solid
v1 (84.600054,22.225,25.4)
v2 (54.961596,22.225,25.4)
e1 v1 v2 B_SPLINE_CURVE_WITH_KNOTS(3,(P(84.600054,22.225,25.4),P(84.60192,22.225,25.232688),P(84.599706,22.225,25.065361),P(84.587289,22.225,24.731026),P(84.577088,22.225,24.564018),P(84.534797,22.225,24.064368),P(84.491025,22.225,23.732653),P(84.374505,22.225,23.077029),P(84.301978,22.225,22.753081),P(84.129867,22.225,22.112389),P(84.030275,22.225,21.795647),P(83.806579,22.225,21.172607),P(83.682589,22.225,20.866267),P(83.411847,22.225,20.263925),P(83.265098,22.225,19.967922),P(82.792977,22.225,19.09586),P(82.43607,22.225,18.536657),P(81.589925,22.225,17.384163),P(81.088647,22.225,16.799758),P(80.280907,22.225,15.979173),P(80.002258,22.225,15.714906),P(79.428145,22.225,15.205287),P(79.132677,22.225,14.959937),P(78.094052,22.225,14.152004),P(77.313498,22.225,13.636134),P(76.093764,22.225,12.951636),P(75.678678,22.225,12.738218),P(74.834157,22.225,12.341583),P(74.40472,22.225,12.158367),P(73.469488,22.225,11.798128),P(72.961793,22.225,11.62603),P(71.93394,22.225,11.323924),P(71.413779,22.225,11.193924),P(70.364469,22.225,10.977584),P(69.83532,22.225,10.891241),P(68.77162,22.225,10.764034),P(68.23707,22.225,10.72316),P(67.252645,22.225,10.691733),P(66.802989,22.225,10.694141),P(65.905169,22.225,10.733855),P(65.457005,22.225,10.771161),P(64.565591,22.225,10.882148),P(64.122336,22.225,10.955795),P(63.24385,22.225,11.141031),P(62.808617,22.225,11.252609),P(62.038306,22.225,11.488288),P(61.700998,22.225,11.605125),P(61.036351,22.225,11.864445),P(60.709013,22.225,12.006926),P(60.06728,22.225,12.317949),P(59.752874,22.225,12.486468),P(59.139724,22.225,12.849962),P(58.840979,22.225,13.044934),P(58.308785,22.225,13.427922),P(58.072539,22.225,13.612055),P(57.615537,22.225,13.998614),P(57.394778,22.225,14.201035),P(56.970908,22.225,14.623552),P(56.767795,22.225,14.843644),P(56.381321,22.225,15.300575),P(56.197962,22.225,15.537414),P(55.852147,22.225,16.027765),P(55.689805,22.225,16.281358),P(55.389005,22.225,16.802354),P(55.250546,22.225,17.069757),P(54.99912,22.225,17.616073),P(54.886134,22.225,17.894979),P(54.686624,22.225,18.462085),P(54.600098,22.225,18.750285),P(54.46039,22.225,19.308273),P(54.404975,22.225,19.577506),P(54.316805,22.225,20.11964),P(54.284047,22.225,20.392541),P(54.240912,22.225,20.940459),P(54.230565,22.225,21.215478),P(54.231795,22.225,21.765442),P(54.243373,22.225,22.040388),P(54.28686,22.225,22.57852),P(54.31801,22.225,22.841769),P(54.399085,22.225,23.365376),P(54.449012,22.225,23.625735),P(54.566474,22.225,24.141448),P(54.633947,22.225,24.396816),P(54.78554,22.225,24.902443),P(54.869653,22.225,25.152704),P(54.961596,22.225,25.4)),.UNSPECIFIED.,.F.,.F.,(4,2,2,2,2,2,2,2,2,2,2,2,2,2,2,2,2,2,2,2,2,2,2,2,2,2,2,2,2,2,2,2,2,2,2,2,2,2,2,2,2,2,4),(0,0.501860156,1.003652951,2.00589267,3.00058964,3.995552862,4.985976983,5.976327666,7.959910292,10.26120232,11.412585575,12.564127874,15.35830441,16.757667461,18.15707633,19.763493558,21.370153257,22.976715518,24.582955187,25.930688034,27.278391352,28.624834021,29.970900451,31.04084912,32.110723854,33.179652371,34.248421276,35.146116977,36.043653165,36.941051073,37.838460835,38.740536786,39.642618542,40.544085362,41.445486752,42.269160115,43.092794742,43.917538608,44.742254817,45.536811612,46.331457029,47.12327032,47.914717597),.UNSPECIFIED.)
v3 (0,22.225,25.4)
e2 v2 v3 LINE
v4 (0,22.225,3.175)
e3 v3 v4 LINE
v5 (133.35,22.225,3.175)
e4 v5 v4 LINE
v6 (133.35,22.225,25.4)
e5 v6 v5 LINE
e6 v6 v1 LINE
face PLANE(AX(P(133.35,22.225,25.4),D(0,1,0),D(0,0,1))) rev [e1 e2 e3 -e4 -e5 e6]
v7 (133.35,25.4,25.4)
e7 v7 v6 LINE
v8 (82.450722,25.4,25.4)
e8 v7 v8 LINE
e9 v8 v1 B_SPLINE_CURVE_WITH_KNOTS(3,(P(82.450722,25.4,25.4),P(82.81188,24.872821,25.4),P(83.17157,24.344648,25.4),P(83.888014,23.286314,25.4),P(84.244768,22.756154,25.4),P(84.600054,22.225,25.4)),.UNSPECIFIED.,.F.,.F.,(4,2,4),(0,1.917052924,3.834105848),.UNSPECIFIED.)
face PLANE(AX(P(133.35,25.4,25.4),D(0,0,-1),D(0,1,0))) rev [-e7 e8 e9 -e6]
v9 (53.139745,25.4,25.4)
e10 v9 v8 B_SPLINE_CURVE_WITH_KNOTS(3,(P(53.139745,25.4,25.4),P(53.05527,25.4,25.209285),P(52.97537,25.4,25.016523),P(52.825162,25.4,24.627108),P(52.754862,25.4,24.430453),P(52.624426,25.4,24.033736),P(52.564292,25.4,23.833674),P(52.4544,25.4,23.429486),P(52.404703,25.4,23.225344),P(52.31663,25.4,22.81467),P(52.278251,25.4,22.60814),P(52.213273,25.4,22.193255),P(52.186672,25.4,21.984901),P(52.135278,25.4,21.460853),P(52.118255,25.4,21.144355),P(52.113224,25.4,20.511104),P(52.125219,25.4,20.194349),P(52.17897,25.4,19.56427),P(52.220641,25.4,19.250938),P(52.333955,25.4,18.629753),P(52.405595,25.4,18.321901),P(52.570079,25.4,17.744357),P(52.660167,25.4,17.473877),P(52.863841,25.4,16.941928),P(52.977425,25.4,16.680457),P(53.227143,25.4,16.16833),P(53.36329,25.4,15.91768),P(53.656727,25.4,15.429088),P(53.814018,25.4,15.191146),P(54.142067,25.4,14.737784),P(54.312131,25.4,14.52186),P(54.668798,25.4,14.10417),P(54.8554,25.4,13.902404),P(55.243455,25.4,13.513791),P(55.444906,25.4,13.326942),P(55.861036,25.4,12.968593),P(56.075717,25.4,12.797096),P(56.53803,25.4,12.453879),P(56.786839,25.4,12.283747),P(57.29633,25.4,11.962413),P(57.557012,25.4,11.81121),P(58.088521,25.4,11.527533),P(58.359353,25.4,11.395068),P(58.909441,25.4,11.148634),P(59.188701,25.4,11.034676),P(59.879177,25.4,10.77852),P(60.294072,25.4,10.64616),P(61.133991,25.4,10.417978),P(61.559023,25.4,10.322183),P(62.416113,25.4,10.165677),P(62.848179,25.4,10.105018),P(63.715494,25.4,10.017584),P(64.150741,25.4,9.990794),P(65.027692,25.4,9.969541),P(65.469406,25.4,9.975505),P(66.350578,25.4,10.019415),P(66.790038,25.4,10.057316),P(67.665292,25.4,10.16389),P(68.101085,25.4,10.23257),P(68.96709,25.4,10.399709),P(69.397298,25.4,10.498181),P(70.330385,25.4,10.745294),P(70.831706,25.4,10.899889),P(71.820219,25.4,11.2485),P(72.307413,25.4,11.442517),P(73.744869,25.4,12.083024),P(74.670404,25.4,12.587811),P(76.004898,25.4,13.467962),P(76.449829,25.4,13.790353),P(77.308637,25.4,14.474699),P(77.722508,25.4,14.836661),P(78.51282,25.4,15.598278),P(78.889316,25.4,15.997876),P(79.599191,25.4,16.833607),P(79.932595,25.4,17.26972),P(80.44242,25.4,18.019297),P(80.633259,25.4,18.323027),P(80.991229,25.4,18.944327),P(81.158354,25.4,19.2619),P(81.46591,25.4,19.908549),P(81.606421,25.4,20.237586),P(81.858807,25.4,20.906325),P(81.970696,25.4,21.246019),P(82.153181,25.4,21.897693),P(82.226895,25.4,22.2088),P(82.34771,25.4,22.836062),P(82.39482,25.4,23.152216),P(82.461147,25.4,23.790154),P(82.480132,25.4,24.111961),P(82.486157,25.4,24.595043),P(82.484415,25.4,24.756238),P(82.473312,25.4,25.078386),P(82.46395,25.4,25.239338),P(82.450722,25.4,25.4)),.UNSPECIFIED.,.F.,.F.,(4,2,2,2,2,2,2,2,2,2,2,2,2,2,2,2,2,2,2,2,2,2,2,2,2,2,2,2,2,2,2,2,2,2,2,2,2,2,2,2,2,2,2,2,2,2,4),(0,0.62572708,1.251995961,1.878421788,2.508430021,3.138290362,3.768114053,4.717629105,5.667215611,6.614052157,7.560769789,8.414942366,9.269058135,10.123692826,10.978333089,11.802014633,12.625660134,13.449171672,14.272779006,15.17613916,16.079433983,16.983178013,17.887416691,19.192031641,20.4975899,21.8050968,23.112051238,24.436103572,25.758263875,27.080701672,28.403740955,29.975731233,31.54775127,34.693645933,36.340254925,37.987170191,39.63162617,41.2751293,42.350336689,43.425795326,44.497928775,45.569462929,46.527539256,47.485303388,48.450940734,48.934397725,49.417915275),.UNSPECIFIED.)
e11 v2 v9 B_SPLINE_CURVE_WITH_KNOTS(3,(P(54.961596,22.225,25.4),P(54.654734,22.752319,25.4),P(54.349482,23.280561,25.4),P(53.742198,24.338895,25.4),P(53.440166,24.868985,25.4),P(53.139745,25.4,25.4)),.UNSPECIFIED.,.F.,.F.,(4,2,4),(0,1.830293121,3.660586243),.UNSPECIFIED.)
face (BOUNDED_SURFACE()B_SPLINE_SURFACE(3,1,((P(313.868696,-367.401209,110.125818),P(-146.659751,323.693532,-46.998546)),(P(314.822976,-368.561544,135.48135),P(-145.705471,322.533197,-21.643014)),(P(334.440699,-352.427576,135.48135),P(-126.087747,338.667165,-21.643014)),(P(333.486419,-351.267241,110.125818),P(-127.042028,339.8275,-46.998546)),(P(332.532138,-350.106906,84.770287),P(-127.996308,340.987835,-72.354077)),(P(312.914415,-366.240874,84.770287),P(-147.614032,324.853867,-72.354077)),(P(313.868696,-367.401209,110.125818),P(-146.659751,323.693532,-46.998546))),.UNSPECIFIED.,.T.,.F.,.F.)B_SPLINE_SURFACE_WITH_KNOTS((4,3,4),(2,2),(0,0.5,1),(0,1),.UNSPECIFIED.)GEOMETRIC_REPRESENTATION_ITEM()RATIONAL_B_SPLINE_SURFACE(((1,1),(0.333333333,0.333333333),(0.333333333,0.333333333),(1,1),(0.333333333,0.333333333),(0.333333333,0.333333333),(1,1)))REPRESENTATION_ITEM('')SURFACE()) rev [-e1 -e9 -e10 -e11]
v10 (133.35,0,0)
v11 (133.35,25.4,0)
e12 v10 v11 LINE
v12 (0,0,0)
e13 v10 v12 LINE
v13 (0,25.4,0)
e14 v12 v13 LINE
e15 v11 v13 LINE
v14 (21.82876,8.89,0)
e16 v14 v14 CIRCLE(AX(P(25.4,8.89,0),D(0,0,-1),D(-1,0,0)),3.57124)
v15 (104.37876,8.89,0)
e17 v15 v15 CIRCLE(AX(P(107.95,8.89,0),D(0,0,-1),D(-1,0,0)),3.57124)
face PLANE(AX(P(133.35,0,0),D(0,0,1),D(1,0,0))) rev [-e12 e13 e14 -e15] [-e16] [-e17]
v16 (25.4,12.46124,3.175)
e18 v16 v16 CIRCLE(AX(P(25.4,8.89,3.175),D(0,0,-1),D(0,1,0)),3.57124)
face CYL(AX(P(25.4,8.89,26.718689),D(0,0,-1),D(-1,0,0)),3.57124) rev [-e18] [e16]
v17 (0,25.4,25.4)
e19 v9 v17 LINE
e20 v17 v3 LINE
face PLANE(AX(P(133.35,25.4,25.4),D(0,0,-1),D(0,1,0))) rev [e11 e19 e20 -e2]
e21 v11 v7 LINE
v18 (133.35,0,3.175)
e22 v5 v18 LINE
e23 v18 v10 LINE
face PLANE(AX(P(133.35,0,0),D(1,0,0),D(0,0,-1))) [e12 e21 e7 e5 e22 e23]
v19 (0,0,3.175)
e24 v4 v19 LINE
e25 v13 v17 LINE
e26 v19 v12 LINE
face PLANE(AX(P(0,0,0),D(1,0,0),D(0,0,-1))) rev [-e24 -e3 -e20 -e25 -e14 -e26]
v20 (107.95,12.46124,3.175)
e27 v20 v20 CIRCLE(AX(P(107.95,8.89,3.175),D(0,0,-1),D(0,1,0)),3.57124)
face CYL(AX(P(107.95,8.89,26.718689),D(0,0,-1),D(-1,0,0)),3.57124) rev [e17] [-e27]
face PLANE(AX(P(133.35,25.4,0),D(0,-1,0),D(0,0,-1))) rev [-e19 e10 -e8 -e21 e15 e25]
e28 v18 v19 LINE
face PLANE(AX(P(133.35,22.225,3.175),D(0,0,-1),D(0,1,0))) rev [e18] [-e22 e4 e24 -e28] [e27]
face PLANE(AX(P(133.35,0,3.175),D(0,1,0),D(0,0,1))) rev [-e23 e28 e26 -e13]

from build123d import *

# Parameters (mm, degrees)
BOSS_EXTRUDE1_DEPTH = 133.35
SKETCH5_R           = 3.57124
CUT_EXTRUDE1_DEPTH  = 139.103376269


with BuildPart() as part:
    # Sketch1 → Boss-Extrude1 (new body)
    with BuildSketch(Plane(origin=(0, 0, 0), x_dir=(0, 0, -1), z_dir=(1, 0, 0))):
        Polygon((0, 0), (0, 25.4), (-25.4, 25.4), (-25.4, 22.225), (-3.175, 22.225), (-3.175, 0), align=None)
    extrude(amount=BOSS_EXTRUDE1_DEPTH)

    # Cut-Sweep1: read off the stored shape, not the designer's step
    # Cut-Sweep1: loft between two sections, ruled curve by curve
    cut_sweep1_from = [
        Edge.make_bspline([(313.868695545, -367.401209175, 110.125818187), (314.822976006, -368.561544306, 135.48134956), (334.440699372, -352.427576105, 135.48134956), (333.486418911, -351.267240974, 110.125818187), (332.53213845, -350.106905843, 84.770286815), (312.914415084, -366.240874045, 84.770286815), (313.868695545, -367.401209175, 110.125818187)], [0, 0, 0, 0, 0.5, 0.5, 0.5, 1, 1, 1, 1], 3, [1, 0.333333333, 0.333333333, 1, 0.333333333, 0.333333333, 1]),
    ]
    cut_sweep1_to = [
        Edge.make_bspline([(-146.659751189, 323.693531683, -46.998545783), (-145.705470727, 322.533196552, -21.64301441), (-126.087747361, 338.667164754, -21.64301441), (-127.042027823, 339.827499885, -46.998545783), (-127.996308284, 340.987835016, -72.354077155), (-147.61403165, 324.853866814, -72.354077155), (-146.659751189, 323.693531683, -46.998545783)], [0, 0, 0, 0, 0.5, 0.5, 0.5, 1, 1, 1, 1], 3, [1, 0.333333333, 0.333333333, 1, 0.333333333, 0.333333333, 1]),
    ]
    cut_sweep1 = Solid(Shell([*[Face.make_surface_from_curves(cut_sweep1_from[k], cut_sweep1_to[k]) for k in range(1)], Face(Wire(cut_sweep1_from)), Face(Wire(cut_sweep1_to))]))
    add(cut_sweep1, mode=Mode.SUBTRACT)

    # Sketch5 → Cut-Extrude1 (cut, through all)
    with BuildSketch(Plane(origin=(0, 0, 0), x_dir=(-1, 0, 0), z_dir=(0, 0, -1))):
        with Locations((-107.95, 8.89)):
            Circle(SKETCH5_R)
        with Locations((-25.4, 8.89)):
            Circle(SKETCH5_R)
    extrude(amount=-CUT_EXTRUDE1_DEPTH, mode=Mode.SUBTRACT)


solid = part.part
